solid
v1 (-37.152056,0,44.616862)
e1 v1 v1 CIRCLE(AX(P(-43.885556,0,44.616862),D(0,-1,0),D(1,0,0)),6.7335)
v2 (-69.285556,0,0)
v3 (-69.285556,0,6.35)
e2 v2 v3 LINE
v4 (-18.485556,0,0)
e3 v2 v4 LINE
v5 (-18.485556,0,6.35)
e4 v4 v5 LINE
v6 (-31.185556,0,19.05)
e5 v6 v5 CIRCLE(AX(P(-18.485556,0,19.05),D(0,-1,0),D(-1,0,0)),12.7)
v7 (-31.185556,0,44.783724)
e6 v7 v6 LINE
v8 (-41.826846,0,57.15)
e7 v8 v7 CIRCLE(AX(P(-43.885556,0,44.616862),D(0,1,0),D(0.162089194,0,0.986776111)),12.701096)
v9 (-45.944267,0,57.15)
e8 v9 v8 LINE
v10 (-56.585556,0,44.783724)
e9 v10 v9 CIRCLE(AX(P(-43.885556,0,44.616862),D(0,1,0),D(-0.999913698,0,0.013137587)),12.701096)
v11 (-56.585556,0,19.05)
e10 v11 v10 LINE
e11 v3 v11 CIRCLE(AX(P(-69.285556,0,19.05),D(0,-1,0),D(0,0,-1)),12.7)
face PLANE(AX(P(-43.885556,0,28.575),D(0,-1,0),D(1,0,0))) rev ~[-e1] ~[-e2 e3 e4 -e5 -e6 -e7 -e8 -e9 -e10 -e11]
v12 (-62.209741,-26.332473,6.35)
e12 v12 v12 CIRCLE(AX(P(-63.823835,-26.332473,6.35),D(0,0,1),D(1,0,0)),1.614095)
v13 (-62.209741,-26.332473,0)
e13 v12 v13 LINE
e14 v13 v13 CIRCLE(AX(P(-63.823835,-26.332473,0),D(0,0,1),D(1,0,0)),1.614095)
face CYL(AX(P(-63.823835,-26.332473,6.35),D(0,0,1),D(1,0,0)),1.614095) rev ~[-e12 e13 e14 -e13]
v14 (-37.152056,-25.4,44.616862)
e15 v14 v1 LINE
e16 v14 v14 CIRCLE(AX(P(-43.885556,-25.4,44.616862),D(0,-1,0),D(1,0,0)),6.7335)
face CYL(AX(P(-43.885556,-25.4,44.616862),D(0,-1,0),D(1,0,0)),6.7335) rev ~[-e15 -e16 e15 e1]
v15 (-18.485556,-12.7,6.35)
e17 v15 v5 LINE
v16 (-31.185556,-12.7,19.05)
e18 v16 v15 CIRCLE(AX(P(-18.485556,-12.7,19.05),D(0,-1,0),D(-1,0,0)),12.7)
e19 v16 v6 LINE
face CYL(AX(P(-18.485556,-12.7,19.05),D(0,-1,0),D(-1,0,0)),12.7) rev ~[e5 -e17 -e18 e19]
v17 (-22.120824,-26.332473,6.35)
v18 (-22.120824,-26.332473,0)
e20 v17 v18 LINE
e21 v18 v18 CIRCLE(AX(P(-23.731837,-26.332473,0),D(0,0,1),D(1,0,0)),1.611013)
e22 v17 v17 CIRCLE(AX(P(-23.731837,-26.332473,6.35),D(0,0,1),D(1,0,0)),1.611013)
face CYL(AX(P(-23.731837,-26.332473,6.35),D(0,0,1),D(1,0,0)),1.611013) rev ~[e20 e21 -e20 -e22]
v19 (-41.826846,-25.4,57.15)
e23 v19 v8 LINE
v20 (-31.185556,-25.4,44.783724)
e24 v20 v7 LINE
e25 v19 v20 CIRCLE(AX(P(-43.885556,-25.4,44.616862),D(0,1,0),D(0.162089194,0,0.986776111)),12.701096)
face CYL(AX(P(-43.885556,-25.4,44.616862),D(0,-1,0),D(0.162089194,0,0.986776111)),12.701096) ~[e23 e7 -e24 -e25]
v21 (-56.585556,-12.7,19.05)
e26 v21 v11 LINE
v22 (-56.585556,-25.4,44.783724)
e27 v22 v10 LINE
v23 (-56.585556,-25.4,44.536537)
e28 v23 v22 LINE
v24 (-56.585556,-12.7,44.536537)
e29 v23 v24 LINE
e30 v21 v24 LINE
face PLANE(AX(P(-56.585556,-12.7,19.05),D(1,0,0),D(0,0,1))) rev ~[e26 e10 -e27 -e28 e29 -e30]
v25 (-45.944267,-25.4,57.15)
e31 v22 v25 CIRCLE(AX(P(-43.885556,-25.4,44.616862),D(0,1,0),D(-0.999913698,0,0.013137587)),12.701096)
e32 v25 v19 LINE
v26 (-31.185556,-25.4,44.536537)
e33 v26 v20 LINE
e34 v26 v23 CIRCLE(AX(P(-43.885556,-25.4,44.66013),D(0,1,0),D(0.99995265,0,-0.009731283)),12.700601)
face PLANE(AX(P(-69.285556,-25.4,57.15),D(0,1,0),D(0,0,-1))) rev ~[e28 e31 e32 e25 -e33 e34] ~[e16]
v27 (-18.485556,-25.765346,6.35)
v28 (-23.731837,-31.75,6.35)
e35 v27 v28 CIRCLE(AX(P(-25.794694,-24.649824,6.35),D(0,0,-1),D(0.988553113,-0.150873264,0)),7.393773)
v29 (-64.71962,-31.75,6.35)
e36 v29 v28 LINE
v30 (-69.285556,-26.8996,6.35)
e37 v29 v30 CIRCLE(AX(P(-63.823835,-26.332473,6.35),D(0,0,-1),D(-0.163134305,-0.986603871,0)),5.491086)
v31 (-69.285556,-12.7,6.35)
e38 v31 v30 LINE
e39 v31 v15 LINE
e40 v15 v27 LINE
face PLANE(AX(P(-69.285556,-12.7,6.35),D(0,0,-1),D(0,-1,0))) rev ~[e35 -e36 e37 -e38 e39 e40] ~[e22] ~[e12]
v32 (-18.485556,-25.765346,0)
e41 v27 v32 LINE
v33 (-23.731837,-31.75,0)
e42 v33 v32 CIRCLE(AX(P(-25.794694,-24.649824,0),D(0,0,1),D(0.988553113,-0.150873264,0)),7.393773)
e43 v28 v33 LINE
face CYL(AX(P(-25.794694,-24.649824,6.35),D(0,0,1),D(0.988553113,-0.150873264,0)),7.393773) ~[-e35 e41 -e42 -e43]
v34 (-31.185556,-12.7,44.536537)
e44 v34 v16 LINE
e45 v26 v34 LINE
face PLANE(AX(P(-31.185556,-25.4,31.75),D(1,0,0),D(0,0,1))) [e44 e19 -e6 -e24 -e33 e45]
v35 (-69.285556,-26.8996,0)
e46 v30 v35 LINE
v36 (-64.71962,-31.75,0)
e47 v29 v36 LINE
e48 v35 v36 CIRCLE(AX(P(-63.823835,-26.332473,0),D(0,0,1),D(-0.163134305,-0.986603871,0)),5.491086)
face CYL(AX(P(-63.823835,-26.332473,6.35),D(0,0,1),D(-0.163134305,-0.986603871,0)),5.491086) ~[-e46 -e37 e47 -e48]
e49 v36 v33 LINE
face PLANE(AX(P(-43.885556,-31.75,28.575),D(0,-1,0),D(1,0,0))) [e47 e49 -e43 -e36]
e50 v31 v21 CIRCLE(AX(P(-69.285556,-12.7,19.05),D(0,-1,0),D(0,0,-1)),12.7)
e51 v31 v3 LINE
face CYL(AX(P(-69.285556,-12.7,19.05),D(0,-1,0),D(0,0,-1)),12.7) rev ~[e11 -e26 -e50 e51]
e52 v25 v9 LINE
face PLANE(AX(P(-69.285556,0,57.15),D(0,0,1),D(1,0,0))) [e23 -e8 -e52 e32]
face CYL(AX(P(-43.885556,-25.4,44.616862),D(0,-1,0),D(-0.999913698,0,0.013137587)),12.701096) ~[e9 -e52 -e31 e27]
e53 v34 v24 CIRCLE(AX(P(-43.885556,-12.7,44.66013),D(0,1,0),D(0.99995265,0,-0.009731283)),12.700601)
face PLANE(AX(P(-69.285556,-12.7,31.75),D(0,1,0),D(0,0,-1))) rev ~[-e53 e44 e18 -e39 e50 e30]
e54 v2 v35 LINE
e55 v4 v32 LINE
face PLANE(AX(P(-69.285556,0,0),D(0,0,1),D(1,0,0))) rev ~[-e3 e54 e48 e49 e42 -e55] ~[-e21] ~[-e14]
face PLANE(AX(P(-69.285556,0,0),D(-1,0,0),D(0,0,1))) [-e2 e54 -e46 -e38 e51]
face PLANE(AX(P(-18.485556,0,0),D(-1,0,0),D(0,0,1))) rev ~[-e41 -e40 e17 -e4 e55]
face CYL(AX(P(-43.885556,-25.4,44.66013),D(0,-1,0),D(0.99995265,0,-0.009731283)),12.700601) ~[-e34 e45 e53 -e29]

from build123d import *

# Parameters (mm, degrees)
F0_W      = 50.8
F0_H      = 57.15
F1_DEPTH  = 31.75
F3_DEPTH  = 50.8
F4_W      = 12.7
F4_H      = 25.4
F5_DEPTH  = 25.4
F6_W      = 12.7
F6_H      = 12.7
F7_DEPTH  = 25.4
F9_DEPTH  = 25.4
F11_DEPTH = 25.4
F13_DEPTH = 12.7
F14_R     = 6.7335002537
F15_DEPTH = 25.4
F17_DEPTH = 25.4
F18_R     = 1.6140947443
F18_R_2   = 1.6110130755
F19_DEPTH = 25.4


with BuildPart() as f1:
    # F0 (on Front) → F1 (new body)
    with BuildSketch(Plane.XZ):
        with Locations((-43.8855561577, 28.575)):
            Rectangle(F0_W, F0_H)
    extrude(amount=F1_DEPTH)

    # F2 (on face) → F3 (cut)
    with BuildSketch(Plane(origin=(-69.2855561577, 0, 0), x_dir=(0, -1, 0), z_dir=(-1, 0, 0))):
        Polygon((12.7, 6.35), (31.75, 6.35), (31.75, 57.15), (25.4, 57.15), (25.4, 31.75), (12.7, 31.75), align=None)
    extrude(amount=-F3_DEPTH, mode=Mode.SUBTRACT)

    # F4 (on face) → F5 (cut)
    with BuildSketch(Plane.XZ.offset(25.4)):
        with Locations((-24.8355561577, 44.45)):
            Rectangle(F4_W, F4_H)
        with Locations((-62.9355561577, 44.45)):
            Rectangle(F4_W, F4_H)
    extrude(amount=-F5_DEPTH, mode=Mode.SUBTRACT)

    # F6 (on face) → F7 (cut)
    with BuildSketch(Plane.XZ.offset(12.7)):
        with Locations((-62.9355561577, 25.4)):
            Rectangle(F6_W, F6_H)
        with Locations((-24.8355561577, 25.4)):
            Rectangle(F6_W, F6_H)
    extrude(amount=-F7_DEPTH, mode=Mode.SUBTRACT)

    # F8 (on face) → F9 (cut)
    with BuildSketch(Plane.XZ.offset(12.7)):
        with BuildLine():
            Line((-69.2855561577, 19.05), (-69.2855561577, 6.35))
            ThreePointArc((-69.2855561577, 6.35), (-60.3053000366, 10.0697438789), (-56.5855561577, 19.05))
            Line((-56.5855561577, 19.05), (-69.2855561577, 19.05))
        make_face()
        with BuildLine():
            ThreePointArc((-31.1855561577, 19.05), (-27.4658122788, 10.0697438789), (-18.4855561577, 6.35))
            Line((-18.4855561577, 6.35), (-18.4855561577, 19.05))
            Line((-18.4855561577, 19.05), (-31.1855561577, 19.05))
        make_face()
    extrude(amount=-F9_DEPTH, mode=Mode.SUBTRACT)

    # F10 (on face) → F11 (cut)
    with BuildSketch(Plane.XZ.offset(25.4)):
        with BuildLine():
            Line((-56.5855561577, 57.15), (-56.5855561577, 44.7837235148))
            ThreePointArc((-56.5855561577, 44.7837235148), (-53.5129172667, 52.9012905804), (-45.9442665885, 57.15))
            Line((-45.9442665885, 57.15), (-56.5855561577, 57.15))
        make_face()
        with BuildLine():
            ThreePointArc((-41.8268457269, 57.15), (-34.2581950488, 52.9012905804), (-31.1855561577, 44.7837235148))
            Line((-31.1855561577, 44.7837235148), (-31.1855561577, 57.15))
            Line((-31.1855561577, 57.15), (-41.8268457269, 57.15))
        make_face()
    extrude(amount=-F11_DEPTH, mode=Mode.SUBTRACT)

    # F12 (on face) → F13 (cut)
    with BuildSketch(Plane.XZ.offset(25.4)):
        with BuildLine():
            ThreePointArc((-31.1855561577, 44.5365372296), (-43.8855561577, 31.9595289981), (-56.5855561577, 44.5365372296))
            Line((-56.5855561577, 44.5365372296), (-56.5855561577, 31.75))
            Line((-56.5855561577, 31.75), (-31.1855561577, 31.75))
            Line((-31.1855561577, 31.75), (-31.1855561577, 44.5365372296))
        make_face()
    extrude(amount=-F13_DEPTH, mode=Mode.SUBTRACT)

    # F14 (on face) → F15 (cut)
    with BuildSketch(Plane.XZ.offset(25.4)):
        with Locations((-43.8855561577, 44.6168617574)):
            Circle(F14_R)
    extrude(amount=-F15_DEPTH, mode=Mode.SUBTRACT)

    # F16 (on face) → F17 (cut)
    with BuildSketch(Plane.XY.offset(6.35)):
        with BuildLine():
            ThreePointArc((-64.719619815, -31.75), (-67.8220929264, -30.0962429481), (-69.2855561577, -26.8995998395))
            Line((-69.2855561577, -26.8995998395), (-69.2855561577, -31.75))
            Line((-69.2855561577, -31.75), (-64.719619815, -31.75))
        make_face()
        with BuildLine():
            Line((-18.4855561577, -31.75), (-18.4855561577, -25.7653463632))
            ThreePointArc((-18.4855561577, -25.7653463632), (-20.2347846396, -29.5237639054), (-23.7318370491, -31.75))
            Line((-23.7318370491, -31.75), (-18.4855561577, -31.75))
        make_face()
    extrude(amount=-F17_DEPTH, mode=Mode.SUBTRACT)

    # F18 (on face) → F19 (cut)
    with BuildSketch(Plane.XY.offset(6.35)):
        with Locations((-63.8238352858, -26.3324731014)):
            Circle(F18_R)
        with Locations((-23.7318370491, -26.3324731014)):
            Circle(F18_R_2)
    extrude(amount=-F19_DEPTH, mode=Mode.SUBTRACT)


solid = f1.part
